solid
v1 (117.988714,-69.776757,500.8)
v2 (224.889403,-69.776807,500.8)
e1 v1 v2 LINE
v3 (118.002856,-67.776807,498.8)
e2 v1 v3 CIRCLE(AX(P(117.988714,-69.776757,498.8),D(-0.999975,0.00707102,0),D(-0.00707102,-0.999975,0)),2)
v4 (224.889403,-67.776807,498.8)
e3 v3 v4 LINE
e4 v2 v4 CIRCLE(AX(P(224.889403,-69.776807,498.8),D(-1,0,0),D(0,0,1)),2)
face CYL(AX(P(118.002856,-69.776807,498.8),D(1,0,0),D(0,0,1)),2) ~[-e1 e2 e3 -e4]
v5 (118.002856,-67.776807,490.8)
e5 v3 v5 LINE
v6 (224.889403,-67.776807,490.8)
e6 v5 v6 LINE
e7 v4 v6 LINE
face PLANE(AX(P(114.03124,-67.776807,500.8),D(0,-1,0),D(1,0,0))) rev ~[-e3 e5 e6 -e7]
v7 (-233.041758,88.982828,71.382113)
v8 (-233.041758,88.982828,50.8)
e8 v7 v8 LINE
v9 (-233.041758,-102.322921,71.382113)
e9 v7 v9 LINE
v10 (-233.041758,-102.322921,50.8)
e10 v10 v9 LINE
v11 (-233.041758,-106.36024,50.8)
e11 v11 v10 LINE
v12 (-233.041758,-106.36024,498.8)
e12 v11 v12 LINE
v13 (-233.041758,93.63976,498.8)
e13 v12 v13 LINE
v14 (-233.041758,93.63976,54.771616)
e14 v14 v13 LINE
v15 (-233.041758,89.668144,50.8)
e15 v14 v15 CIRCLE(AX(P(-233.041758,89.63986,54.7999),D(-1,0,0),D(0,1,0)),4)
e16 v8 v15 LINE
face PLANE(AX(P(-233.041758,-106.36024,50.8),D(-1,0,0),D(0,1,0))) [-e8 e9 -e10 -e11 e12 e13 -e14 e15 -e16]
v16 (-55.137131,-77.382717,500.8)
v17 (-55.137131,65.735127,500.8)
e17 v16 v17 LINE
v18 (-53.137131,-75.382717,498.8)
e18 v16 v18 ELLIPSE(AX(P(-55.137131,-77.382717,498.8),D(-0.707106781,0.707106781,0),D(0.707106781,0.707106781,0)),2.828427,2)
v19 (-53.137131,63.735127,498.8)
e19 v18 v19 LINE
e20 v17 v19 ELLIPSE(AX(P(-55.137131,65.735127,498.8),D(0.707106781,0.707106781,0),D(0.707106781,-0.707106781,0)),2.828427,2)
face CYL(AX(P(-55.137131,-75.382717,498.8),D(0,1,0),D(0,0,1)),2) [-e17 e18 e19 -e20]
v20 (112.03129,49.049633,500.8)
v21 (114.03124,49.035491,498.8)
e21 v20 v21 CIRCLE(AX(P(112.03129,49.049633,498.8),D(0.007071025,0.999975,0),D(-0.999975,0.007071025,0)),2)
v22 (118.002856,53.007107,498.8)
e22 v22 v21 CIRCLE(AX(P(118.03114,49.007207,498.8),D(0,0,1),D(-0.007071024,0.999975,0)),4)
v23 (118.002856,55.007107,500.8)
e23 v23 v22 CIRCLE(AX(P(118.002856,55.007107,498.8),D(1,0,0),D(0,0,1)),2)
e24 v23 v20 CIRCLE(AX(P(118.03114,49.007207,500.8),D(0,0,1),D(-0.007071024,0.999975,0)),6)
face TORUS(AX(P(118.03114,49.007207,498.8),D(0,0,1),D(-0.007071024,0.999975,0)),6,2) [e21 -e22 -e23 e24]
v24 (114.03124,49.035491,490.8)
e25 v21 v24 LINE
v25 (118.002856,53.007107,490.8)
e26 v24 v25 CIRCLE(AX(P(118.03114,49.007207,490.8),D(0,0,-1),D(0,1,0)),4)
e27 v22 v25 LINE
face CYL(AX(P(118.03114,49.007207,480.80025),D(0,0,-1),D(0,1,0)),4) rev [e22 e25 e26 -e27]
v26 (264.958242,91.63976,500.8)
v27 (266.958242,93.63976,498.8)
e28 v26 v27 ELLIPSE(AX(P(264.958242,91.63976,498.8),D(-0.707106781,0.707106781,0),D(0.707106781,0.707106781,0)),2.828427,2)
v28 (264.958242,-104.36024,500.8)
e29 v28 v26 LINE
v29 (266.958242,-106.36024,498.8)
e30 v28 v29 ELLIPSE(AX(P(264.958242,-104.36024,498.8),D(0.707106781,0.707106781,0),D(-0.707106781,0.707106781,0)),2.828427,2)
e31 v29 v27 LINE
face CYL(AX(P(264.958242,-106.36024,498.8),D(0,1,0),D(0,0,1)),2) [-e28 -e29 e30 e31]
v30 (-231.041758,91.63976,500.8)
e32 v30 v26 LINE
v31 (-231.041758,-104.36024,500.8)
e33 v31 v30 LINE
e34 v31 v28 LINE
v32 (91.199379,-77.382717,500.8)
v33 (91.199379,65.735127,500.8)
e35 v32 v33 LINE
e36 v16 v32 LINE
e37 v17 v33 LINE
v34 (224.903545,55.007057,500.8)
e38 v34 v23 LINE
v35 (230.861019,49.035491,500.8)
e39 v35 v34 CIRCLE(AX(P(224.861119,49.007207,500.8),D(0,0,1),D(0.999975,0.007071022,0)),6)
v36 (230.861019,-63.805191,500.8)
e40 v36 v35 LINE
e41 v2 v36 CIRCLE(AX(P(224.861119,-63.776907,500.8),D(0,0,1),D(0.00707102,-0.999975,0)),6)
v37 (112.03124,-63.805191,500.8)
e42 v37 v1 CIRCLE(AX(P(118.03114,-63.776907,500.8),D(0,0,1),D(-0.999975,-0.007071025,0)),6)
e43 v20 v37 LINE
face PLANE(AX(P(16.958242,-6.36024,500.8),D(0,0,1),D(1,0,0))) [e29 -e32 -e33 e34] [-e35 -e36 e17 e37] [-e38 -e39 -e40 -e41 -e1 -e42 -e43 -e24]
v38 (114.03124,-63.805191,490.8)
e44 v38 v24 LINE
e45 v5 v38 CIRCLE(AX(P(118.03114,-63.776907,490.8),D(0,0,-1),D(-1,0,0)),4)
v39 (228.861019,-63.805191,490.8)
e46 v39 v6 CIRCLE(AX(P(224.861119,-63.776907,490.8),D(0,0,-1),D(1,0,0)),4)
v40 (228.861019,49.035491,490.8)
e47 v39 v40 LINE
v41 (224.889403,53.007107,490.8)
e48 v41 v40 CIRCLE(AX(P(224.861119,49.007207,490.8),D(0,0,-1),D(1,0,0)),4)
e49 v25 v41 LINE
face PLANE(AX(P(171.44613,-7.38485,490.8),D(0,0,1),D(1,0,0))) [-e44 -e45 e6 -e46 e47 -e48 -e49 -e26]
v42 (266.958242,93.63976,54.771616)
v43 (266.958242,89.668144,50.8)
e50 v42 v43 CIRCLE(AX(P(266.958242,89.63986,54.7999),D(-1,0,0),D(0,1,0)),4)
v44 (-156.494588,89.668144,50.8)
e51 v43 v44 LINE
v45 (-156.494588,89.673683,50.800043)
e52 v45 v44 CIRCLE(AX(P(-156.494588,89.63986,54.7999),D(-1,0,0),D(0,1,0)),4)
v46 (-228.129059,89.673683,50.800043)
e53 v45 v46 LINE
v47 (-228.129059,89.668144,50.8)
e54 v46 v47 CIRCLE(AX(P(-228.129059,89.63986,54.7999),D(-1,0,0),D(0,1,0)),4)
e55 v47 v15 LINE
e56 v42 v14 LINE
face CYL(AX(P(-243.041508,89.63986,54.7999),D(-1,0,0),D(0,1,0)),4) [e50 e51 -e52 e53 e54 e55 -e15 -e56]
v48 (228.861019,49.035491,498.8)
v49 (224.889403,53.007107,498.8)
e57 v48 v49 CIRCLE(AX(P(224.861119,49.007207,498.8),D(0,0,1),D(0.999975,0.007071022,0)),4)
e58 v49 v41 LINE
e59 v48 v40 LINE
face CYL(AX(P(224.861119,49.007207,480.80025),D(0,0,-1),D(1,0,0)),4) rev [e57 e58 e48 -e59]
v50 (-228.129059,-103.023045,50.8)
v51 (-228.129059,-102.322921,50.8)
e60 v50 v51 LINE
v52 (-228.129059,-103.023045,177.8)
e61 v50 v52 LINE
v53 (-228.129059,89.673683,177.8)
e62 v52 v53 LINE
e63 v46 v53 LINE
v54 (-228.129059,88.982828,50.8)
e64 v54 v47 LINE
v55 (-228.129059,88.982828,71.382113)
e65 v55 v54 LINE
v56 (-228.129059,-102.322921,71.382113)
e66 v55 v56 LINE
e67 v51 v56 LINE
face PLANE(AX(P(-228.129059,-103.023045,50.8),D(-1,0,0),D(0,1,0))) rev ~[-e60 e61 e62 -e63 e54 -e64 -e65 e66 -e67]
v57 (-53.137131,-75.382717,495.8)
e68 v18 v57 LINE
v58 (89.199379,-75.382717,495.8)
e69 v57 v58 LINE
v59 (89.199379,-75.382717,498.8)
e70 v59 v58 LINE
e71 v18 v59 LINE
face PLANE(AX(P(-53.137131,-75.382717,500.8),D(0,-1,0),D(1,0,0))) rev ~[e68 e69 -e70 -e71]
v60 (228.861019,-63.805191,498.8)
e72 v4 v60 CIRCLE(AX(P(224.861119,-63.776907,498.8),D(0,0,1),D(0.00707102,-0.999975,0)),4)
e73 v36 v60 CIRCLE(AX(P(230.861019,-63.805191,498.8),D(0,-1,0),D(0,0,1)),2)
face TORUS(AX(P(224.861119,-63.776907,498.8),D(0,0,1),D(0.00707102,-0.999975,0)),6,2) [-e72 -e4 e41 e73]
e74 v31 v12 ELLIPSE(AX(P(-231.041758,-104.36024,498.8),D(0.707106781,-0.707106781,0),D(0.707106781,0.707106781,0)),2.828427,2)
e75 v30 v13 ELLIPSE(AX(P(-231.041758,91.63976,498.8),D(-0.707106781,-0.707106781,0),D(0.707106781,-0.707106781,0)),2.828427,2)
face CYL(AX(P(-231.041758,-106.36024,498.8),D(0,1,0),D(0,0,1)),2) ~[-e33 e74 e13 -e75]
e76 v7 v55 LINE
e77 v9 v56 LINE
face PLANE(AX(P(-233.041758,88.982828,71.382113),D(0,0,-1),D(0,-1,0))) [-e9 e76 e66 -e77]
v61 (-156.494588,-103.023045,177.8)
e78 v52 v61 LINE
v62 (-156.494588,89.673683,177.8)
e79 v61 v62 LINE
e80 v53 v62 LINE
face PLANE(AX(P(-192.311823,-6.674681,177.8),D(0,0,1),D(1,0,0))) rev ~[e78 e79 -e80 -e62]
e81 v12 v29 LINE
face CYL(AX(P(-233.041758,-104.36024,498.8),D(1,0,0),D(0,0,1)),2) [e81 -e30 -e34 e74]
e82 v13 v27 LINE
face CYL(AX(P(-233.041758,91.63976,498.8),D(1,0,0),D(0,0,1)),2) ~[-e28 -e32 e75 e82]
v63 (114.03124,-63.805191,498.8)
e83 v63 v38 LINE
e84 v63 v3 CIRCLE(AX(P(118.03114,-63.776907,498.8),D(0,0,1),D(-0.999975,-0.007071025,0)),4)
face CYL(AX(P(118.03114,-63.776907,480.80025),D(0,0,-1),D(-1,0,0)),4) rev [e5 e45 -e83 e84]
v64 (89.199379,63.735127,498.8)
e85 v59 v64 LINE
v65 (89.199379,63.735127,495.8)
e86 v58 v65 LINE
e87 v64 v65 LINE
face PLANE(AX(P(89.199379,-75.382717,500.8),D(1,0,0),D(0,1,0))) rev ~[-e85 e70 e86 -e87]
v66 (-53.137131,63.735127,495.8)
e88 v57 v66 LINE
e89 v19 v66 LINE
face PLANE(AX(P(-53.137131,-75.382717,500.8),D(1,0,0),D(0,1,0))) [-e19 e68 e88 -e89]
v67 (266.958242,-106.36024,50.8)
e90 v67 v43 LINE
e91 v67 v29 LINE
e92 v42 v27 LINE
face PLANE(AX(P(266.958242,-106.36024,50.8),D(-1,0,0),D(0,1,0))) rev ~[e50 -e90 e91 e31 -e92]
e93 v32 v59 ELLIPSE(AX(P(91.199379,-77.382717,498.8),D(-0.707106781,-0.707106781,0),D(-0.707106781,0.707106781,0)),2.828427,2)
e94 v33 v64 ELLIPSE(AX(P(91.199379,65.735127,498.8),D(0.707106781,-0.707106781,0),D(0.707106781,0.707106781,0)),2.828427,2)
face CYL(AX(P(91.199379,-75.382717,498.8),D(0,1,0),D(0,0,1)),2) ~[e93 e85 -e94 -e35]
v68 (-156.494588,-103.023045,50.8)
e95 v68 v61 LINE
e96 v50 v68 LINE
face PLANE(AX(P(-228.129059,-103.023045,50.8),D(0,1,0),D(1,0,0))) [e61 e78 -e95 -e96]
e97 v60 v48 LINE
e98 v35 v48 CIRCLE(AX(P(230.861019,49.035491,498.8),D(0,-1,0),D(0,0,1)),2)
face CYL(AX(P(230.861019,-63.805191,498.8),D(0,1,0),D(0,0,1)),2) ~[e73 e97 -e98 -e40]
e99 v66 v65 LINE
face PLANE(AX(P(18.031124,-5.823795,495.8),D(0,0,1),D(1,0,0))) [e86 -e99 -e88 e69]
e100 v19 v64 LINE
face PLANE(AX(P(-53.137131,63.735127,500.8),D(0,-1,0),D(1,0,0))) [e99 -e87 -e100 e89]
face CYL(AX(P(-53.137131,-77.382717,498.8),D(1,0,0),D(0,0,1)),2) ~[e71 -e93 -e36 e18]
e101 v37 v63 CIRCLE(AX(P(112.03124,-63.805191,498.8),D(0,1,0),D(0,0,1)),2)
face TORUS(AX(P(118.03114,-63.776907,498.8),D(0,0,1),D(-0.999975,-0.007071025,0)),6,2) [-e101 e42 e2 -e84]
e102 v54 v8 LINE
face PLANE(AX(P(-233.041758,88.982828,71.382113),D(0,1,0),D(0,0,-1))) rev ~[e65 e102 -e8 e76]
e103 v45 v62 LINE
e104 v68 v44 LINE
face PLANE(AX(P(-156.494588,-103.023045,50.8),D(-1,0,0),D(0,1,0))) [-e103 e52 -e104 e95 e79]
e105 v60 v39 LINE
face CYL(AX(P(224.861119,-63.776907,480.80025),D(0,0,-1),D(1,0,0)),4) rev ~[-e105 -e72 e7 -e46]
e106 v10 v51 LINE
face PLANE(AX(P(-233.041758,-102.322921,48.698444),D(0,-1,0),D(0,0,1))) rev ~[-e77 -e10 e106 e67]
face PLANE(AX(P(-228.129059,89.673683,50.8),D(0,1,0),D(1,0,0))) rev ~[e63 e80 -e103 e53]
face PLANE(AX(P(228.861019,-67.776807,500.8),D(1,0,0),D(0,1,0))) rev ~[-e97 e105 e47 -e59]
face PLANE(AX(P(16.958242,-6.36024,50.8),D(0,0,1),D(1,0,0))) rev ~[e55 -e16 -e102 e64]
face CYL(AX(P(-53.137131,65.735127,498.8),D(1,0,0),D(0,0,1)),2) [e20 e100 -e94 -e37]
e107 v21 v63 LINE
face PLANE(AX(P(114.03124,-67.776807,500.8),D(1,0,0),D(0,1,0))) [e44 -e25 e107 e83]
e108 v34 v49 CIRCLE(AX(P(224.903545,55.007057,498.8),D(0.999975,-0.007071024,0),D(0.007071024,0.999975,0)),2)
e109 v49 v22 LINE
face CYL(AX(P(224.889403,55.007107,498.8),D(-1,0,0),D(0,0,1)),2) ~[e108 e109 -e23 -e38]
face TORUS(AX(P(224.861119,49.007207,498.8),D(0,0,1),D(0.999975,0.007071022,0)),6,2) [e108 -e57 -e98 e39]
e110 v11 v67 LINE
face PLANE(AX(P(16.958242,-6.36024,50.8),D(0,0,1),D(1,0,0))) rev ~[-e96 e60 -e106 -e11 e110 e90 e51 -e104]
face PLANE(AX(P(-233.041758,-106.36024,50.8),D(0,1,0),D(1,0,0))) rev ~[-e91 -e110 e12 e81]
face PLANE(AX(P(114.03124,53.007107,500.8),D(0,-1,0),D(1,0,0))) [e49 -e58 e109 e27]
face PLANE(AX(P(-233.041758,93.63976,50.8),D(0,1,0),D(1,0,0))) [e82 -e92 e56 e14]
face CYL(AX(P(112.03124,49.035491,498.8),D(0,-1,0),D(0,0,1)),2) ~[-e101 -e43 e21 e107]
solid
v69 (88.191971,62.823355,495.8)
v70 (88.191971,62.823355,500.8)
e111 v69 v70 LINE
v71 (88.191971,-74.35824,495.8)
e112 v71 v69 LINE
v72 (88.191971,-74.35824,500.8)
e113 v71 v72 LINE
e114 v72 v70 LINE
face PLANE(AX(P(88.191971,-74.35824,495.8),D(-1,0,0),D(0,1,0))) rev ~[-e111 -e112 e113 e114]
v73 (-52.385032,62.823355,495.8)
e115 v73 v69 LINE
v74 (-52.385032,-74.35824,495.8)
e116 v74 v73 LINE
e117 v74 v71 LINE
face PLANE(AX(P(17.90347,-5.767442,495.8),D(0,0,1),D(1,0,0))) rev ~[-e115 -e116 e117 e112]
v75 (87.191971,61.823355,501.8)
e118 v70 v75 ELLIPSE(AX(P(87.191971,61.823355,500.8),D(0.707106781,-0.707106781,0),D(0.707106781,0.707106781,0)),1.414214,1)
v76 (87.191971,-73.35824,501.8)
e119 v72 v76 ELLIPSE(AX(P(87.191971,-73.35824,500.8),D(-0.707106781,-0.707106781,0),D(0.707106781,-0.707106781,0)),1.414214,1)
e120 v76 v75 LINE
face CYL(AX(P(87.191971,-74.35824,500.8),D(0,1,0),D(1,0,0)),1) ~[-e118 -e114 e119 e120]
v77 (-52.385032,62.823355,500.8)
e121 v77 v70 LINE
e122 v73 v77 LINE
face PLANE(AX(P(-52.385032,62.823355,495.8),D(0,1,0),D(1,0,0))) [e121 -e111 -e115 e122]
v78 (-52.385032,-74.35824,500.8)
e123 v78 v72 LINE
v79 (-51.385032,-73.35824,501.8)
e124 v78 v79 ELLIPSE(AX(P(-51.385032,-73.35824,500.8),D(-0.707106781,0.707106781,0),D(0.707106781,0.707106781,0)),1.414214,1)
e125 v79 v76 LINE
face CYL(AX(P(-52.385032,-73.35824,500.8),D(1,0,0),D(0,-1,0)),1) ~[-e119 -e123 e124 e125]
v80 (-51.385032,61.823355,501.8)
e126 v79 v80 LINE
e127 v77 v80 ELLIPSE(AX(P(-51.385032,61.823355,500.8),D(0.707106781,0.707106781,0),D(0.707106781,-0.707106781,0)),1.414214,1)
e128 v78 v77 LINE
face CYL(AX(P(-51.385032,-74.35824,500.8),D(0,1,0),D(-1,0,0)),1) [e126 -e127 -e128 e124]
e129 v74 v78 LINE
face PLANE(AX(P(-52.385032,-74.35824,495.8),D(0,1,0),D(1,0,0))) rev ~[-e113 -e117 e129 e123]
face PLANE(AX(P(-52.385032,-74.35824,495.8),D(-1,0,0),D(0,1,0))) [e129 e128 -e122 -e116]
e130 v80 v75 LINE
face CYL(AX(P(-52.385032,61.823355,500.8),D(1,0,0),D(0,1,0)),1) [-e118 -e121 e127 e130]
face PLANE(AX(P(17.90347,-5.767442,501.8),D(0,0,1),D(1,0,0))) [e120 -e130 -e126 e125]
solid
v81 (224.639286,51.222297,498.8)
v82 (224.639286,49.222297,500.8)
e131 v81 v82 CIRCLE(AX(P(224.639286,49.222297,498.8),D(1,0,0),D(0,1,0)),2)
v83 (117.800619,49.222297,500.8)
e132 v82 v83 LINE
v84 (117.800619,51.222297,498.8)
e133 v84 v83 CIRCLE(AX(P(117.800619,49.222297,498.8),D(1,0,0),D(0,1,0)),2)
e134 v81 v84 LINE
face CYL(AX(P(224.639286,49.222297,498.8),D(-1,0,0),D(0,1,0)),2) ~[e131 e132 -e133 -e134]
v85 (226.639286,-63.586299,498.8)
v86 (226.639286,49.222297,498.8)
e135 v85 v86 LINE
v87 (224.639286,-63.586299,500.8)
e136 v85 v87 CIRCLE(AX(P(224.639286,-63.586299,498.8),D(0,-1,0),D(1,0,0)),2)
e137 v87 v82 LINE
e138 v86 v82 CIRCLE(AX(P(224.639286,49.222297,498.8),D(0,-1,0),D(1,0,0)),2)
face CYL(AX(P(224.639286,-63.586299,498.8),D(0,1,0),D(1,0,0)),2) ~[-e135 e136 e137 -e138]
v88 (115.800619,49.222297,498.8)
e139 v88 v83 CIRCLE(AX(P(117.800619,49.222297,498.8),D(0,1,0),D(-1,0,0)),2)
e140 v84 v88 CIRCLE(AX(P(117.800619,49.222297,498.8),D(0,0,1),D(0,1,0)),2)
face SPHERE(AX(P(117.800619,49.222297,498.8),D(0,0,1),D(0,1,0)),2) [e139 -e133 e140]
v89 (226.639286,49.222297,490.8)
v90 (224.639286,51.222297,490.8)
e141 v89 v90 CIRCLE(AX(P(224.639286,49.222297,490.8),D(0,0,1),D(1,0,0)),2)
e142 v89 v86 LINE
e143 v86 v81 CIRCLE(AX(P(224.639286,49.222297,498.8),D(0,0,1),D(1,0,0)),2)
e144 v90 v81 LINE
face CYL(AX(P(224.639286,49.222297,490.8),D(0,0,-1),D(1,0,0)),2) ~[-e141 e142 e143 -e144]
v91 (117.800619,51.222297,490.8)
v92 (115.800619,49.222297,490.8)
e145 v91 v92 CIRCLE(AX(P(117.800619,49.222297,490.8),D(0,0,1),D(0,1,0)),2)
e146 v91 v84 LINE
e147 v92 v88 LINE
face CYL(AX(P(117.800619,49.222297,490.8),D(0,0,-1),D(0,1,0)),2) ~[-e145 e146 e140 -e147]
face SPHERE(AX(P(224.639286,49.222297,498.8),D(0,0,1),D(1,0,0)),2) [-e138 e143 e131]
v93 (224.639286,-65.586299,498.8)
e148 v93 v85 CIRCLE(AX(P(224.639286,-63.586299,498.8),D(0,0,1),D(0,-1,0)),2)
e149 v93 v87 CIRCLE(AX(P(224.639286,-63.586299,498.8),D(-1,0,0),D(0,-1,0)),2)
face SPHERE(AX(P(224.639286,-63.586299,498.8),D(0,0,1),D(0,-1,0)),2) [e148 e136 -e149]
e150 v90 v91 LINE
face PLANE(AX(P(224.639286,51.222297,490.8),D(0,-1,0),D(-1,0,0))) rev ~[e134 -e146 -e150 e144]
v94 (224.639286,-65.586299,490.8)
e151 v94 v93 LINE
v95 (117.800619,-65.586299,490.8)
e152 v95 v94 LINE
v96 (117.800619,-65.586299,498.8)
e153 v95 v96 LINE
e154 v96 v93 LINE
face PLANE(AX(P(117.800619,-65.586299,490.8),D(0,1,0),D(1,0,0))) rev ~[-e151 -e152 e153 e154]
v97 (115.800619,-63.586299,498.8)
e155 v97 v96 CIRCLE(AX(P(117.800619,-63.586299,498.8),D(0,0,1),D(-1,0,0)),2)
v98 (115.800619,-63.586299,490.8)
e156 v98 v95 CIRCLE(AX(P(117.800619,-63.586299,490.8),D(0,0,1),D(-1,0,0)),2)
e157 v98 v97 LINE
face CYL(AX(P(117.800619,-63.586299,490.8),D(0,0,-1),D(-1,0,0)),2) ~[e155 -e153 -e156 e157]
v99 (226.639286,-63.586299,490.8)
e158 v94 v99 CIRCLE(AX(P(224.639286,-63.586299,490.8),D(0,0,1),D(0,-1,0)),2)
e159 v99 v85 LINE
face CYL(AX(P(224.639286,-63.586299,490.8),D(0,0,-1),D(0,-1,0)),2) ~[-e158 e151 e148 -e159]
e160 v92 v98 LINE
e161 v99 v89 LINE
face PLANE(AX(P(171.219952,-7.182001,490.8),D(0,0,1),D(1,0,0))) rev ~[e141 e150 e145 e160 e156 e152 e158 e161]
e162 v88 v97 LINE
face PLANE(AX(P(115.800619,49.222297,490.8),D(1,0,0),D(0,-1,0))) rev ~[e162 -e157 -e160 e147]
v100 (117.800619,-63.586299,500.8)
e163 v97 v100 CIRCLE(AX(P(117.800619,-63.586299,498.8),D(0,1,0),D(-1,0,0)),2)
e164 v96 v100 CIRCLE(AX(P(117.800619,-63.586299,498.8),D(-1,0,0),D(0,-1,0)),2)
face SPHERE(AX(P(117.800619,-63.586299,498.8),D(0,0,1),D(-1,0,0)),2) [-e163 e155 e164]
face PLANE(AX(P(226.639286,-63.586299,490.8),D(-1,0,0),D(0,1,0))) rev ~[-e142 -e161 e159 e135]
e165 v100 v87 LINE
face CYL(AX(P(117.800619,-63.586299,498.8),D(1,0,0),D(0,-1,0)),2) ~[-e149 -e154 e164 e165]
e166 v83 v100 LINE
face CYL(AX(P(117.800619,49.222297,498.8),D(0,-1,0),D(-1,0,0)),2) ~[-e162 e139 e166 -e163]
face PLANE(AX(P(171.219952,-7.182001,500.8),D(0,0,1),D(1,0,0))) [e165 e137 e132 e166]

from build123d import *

# Parameters (mm, degrees)
F1_W        = 500
F1_H        = 200
F2_DEPTH    = 450
F3_W        = 114.8297786713
F3_H        = 120.7839138806
F4_DEPTH    = 10
F5_T1_DEPTH = 19.9997500031
F5_T3_DEPTH = 519.9995000063
F7_DEPTH    = 10
F8_R        = 2
F9_W        = 142.3365101218
F9_H        = 139.1178444028
F10_DEPTH   = 5
F11_W       = 140.5770033598
F11_H       = 137.1815949678
F12_DEPTH   = 6
F13_R       = 1
F14_R       = 2
F15_W       = 71.6344714165
F15_H       = 192.6967278123
F16_DEPTH   = 127
F17_W       = 191.3057491183
F17_H       = 2.1015560806
F17_H_2     = 20.5821128011
F18_DEPTH   = 76.5471703


# Not quite as in the source:
# - a fillet or chamfer that OpenCascade refuses, or shapes differently, is made with other operations: its cross-section is extruded or revolved along the edge and cut away or added
# - an extrude ends at something that could not be found from the text; its depth is read off the source's solid


with BuildPart() as f2:
    # F1 (on offset) → F2 (new body)
    with BuildSketch(Plane.XY.offset(50.8)):
        with Locations((16.9582420111, -6.3602398952)):
            Rectangle(F1_W, F1_H)
    extrude(amount=F2_DEPTH)

    # F3 (on face) → F4 (cut)
    with BuildSketch(Plane.XY.offset(500.8)):
        with Locations((171.4461296797, -7.3848497123)):
            Rectangle(F3_W, F3_H)
    extrude(amount=-F4_DEPTH, mode=Mode.SUBTRACT)

    # F5: fillet of radius 4 on 5 edges, made by hand

    # F5_s2 → F5_t1 (join)
    with BuildSketch(Plane.XY.offset(480.8002499969)):
        with BuildLine():
            ThreePointArc((228.8611190153, 49.007207228), (227.6895461401, 51.8356343528), (224.8611190153, 53.007207228))
            Line((224.8611190153, 53.007207228), (224.8611190153, 53.087207228))
            ThreePointArc((224.8611190153, 53.087207228), (226.8610690153, 53.087107228), (228.8610190153, 53.087107228))
            Line((228.8610190153, 53.087107228), (228.9410190153, 53.007107228))
            ThreePointArc((228.9410190153, 53.007107228), (228.9410190153, 51.007157228), (228.9411190153, 49.007207228))
            Line((228.9411190153, 49.007207228), (228.8611190153, 49.007207228))
        make_face()
        with BuildLine():
            ThreePointArc((228.8611190153, -63.7769066525), (227.6895461401, -66.6053337773), (224.8611190153, -67.7769066525))
            Line((224.8611190153, -67.7769066525), (224.8611190153, -67.8569066525))
            ThreePointArc((224.8611190153, -67.8569066525), (226.8610690153, -67.8568066525), (228.8610190153, -67.8568066525))
            Line((228.8610190153, -67.8568066525), (228.9410190153, -67.7768066525))
            ThreePointArc((228.9410190153, -67.7768066525), (228.9410190153, -65.7768566525), (228.9411190153, -63.7769066525))
            Line((228.9411190153, -63.7769066525), (228.8611190153, -63.7769066525))
        make_face()
        with BuildLine():
            ThreePointArc((118.031140344, 53.007207228), (115.2027132193, 51.8356343528), (114.031140344, 49.007207228))
            Line((114.031140344, 49.007207228), (113.951140344, 49.007207228))
            ThreePointArc((113.951140344, 49.007207228), (113.951240344, 51.007157228), (113.951240344, 53.007107228))
            Line((113.951240344, 53.007107228), (114.031240344, 53.087107228))
            ThreePointArc((114.031240344, 53.087107228), (116.031190344, 53.087107228), (118.031140344, 53.087207228))
            Line((118.031140344, 53.087207228), (118.031140344, 53.007207228))
        make_face()
        with BuildLine():
            ThreePointArc((114.031140344, -63.7769066525), (115.2027132193, -66.6053337773), (118.031140344, -67.7769066525))
            Line((118.031140344, -67.7769066525), (118.031140344, -67.8569066525))
            ThreePointArc((118.031140344, -67.8569066525), (116.031190344, -67.8568066525), (114.031240344, -67.8568066525))
            Line((114.031240344, -67.8568066525), (113.951240344, -67.7768066525))
            ThreePointArc((113.951240344, -67.7768066525), (113.951240344, -65.7768566525), (113.951140344, -63.7769066525))
            Line((113.951140344, -63.7769066525), (114.031140344, -63.7769066525))
        make_face()
    extrude(amount=F5_T1_DEPTH)

    # F5_s4 → F5_t3 (cut)
    with BuildSketch(Plane.YZ.offset(-243.0415079921)):
        with BuildLine():
            ThreePointArc((93.6398601048, 54.7999), (92.4682872295, 51.9714728753), (89.6398601048, 50.7999))
            Line((89.6398601048, 50.7999), (89.6398601048, 50.7199))
            ThreePointArc((89.6398601048, 50.7199), (91.6398101048, 50.72), (93.6397601048, 50.72))
            Line((93.6397601048, 50.72), (93.7197601048, 50.8))
            ThreePointArc((93.7197601048, 50.8), (93.7197601048, 52.79995), (93.7198601048, 54.7999))
            Line((93.7198601048, 54.7999), (93.6398601048, 54.7999))
        make_face()
    extrude(amount=F5_T3_DEPTH, mode=Mode.SUBTRACT)

    # F9 (on face) → F10 (cut)
    with BuildSketch(Plane.XY.offset(500.8)):
        with Locations((18.0311240256, -5.8237947524)):
            Rectangle(F9_W, F9_H)
    extrude(amount=-F10_DEPTH, mode=Mode.SUBTRACT)

    # F14
    f14_edges = [f2.edges().sort_by_distance(p)[0] for p in [
        (266.958242, -6.36024, 500.8),
        (16.958242, -106.36024, 500.8),
        (16.958242, 93.63976, 500.8),
        (-233.041758, -6.36024, 500.8),
        (228.861019, -7.38485, 500.8),
        (227.689546, -66.605334, 500.8),
        (227.689546, 51.835634, 500.8),
        (171.44613, -67.776807, 500.8),
        (171.44613, 53.007107, 500.8),
        (115.202713, -66.605334, 500.8),
        (115.202713, 51.835634, 500.8),
        (114.03124, -7.38485, 500.8),
        (89.199379, -5.823795, 500.8),
        (18.031124, 63.735127, 500.8),
        (-53.137131, -5.823795, 500.8),
        (18.031124, -75.382717, 500.8),
    ]]
    fillet(f14_edges, radius=F14_R)

    # F15 (on face) → F16 (cut)
    with BuildSketch(Plane.XY.offset(50.8)):
        with Locations((-192.3118233681, -6.6746808589)):
            Rectangle(F15_W, F15_H)
    extrude(amount=F16_DEPTH, mode=Mode.SUBTRACT)

    # F17 (on face) → F18 (cut, through all)
    with BuildSketch(Plane(origin=(-233.0417579889, 0, 0), x_dir=(0, -1, 0), z_dir=(-1, 0, 0))):
        with Locations((6.6700465977, 49.7492219597)):
            Rectangle(F17_W, F17_H)
        with Locations((6.6700465977, 61.0910564005)):
            Rectangle(F17_W, F17_H_2)
    extrude(amount=-F18_DEPTH, mode=Mode.SUBTRACT)


with BuildPart() as f7:
    # F6 (on face) → F7 (new body)
    with BuildSketch(Plane.XY.offset(490.8)):
        with BuildLine():
            Line((224.6392856836, 51.2222974241), (117.8006191254, 51.2222974241))
            ThreePointArc((117.8006191254, 51.2222974241), (116.386405563, 50.6365109865), (115.8006191254, 49.2222974241))
            Line((115.8006191254, 49.2222974241), (115.8006191254, -63.5862987041))
            ThreePointArc((115.8006191254, -63.5862987041), (116.386405563, -65.0005122665), (117.8006191254, -65.5862987041))
            Line((117.8006191254, -65.5862987041), (224.6392856836, -65.5862987041))
            ThreePointArc((224.6392856836, -65.5862987041), (226.053499246, -65.0005122665), (226.6392856836, -63.5862987041))
            Line((226.6392856836, -63.5862987041), (226.6392856836, 49.2222974241))
            ThreePointArc((226.6392856836, 49.2222974241), (226.053499246, 50.6365109865), (224.6392856836, 51.2222974241))
        make_face()
    extrude(amount=F7_DEPTH)

    # F8
    f8_edges = [f7.edges().sort_by_distance(p)[0] for p in [
        (171.219952, 51.222297, 500.8),
        (116.386406, 50.636511, 500.8),
        (115.800619, -7.182001, 500.8),
        (116.386406, -65.000512, 500.8),
        (171.219952, -65.586299, 500.8),
        (226.053499, -65.000512, 500.8),
        (226.639286, -7.182001, 500.8),
        (226.053499, 50.636511, 500.8),
    ]]
    fillet(f8_edges, radius=F8_R)


with BuildPart() as f12:
    # F11 (on face) → F12 (new body)
    with BuildSketch(Plane.XY.offset(495.8)):
        with Locations((17.9034695029, -5.767442286)):
            Rectangle(F11_W, F11_H)
    extrude(amount=F12_DEPTH)

    # F13
    f13_edges = [f12.edges().sort_by_distance(p)[0] for p in [
        (17.90347, 62.823355, 501.8),
        (-52.385032, -5.767442, 501.8),
        (17.90347, -74.35824, 501.8),
        (88.191971, -5.767442, 501.8),
    ]]
    fillet(f13_edges, radius=F13_R)


solid = Compound([f2.part, f7.part, f12.part])
